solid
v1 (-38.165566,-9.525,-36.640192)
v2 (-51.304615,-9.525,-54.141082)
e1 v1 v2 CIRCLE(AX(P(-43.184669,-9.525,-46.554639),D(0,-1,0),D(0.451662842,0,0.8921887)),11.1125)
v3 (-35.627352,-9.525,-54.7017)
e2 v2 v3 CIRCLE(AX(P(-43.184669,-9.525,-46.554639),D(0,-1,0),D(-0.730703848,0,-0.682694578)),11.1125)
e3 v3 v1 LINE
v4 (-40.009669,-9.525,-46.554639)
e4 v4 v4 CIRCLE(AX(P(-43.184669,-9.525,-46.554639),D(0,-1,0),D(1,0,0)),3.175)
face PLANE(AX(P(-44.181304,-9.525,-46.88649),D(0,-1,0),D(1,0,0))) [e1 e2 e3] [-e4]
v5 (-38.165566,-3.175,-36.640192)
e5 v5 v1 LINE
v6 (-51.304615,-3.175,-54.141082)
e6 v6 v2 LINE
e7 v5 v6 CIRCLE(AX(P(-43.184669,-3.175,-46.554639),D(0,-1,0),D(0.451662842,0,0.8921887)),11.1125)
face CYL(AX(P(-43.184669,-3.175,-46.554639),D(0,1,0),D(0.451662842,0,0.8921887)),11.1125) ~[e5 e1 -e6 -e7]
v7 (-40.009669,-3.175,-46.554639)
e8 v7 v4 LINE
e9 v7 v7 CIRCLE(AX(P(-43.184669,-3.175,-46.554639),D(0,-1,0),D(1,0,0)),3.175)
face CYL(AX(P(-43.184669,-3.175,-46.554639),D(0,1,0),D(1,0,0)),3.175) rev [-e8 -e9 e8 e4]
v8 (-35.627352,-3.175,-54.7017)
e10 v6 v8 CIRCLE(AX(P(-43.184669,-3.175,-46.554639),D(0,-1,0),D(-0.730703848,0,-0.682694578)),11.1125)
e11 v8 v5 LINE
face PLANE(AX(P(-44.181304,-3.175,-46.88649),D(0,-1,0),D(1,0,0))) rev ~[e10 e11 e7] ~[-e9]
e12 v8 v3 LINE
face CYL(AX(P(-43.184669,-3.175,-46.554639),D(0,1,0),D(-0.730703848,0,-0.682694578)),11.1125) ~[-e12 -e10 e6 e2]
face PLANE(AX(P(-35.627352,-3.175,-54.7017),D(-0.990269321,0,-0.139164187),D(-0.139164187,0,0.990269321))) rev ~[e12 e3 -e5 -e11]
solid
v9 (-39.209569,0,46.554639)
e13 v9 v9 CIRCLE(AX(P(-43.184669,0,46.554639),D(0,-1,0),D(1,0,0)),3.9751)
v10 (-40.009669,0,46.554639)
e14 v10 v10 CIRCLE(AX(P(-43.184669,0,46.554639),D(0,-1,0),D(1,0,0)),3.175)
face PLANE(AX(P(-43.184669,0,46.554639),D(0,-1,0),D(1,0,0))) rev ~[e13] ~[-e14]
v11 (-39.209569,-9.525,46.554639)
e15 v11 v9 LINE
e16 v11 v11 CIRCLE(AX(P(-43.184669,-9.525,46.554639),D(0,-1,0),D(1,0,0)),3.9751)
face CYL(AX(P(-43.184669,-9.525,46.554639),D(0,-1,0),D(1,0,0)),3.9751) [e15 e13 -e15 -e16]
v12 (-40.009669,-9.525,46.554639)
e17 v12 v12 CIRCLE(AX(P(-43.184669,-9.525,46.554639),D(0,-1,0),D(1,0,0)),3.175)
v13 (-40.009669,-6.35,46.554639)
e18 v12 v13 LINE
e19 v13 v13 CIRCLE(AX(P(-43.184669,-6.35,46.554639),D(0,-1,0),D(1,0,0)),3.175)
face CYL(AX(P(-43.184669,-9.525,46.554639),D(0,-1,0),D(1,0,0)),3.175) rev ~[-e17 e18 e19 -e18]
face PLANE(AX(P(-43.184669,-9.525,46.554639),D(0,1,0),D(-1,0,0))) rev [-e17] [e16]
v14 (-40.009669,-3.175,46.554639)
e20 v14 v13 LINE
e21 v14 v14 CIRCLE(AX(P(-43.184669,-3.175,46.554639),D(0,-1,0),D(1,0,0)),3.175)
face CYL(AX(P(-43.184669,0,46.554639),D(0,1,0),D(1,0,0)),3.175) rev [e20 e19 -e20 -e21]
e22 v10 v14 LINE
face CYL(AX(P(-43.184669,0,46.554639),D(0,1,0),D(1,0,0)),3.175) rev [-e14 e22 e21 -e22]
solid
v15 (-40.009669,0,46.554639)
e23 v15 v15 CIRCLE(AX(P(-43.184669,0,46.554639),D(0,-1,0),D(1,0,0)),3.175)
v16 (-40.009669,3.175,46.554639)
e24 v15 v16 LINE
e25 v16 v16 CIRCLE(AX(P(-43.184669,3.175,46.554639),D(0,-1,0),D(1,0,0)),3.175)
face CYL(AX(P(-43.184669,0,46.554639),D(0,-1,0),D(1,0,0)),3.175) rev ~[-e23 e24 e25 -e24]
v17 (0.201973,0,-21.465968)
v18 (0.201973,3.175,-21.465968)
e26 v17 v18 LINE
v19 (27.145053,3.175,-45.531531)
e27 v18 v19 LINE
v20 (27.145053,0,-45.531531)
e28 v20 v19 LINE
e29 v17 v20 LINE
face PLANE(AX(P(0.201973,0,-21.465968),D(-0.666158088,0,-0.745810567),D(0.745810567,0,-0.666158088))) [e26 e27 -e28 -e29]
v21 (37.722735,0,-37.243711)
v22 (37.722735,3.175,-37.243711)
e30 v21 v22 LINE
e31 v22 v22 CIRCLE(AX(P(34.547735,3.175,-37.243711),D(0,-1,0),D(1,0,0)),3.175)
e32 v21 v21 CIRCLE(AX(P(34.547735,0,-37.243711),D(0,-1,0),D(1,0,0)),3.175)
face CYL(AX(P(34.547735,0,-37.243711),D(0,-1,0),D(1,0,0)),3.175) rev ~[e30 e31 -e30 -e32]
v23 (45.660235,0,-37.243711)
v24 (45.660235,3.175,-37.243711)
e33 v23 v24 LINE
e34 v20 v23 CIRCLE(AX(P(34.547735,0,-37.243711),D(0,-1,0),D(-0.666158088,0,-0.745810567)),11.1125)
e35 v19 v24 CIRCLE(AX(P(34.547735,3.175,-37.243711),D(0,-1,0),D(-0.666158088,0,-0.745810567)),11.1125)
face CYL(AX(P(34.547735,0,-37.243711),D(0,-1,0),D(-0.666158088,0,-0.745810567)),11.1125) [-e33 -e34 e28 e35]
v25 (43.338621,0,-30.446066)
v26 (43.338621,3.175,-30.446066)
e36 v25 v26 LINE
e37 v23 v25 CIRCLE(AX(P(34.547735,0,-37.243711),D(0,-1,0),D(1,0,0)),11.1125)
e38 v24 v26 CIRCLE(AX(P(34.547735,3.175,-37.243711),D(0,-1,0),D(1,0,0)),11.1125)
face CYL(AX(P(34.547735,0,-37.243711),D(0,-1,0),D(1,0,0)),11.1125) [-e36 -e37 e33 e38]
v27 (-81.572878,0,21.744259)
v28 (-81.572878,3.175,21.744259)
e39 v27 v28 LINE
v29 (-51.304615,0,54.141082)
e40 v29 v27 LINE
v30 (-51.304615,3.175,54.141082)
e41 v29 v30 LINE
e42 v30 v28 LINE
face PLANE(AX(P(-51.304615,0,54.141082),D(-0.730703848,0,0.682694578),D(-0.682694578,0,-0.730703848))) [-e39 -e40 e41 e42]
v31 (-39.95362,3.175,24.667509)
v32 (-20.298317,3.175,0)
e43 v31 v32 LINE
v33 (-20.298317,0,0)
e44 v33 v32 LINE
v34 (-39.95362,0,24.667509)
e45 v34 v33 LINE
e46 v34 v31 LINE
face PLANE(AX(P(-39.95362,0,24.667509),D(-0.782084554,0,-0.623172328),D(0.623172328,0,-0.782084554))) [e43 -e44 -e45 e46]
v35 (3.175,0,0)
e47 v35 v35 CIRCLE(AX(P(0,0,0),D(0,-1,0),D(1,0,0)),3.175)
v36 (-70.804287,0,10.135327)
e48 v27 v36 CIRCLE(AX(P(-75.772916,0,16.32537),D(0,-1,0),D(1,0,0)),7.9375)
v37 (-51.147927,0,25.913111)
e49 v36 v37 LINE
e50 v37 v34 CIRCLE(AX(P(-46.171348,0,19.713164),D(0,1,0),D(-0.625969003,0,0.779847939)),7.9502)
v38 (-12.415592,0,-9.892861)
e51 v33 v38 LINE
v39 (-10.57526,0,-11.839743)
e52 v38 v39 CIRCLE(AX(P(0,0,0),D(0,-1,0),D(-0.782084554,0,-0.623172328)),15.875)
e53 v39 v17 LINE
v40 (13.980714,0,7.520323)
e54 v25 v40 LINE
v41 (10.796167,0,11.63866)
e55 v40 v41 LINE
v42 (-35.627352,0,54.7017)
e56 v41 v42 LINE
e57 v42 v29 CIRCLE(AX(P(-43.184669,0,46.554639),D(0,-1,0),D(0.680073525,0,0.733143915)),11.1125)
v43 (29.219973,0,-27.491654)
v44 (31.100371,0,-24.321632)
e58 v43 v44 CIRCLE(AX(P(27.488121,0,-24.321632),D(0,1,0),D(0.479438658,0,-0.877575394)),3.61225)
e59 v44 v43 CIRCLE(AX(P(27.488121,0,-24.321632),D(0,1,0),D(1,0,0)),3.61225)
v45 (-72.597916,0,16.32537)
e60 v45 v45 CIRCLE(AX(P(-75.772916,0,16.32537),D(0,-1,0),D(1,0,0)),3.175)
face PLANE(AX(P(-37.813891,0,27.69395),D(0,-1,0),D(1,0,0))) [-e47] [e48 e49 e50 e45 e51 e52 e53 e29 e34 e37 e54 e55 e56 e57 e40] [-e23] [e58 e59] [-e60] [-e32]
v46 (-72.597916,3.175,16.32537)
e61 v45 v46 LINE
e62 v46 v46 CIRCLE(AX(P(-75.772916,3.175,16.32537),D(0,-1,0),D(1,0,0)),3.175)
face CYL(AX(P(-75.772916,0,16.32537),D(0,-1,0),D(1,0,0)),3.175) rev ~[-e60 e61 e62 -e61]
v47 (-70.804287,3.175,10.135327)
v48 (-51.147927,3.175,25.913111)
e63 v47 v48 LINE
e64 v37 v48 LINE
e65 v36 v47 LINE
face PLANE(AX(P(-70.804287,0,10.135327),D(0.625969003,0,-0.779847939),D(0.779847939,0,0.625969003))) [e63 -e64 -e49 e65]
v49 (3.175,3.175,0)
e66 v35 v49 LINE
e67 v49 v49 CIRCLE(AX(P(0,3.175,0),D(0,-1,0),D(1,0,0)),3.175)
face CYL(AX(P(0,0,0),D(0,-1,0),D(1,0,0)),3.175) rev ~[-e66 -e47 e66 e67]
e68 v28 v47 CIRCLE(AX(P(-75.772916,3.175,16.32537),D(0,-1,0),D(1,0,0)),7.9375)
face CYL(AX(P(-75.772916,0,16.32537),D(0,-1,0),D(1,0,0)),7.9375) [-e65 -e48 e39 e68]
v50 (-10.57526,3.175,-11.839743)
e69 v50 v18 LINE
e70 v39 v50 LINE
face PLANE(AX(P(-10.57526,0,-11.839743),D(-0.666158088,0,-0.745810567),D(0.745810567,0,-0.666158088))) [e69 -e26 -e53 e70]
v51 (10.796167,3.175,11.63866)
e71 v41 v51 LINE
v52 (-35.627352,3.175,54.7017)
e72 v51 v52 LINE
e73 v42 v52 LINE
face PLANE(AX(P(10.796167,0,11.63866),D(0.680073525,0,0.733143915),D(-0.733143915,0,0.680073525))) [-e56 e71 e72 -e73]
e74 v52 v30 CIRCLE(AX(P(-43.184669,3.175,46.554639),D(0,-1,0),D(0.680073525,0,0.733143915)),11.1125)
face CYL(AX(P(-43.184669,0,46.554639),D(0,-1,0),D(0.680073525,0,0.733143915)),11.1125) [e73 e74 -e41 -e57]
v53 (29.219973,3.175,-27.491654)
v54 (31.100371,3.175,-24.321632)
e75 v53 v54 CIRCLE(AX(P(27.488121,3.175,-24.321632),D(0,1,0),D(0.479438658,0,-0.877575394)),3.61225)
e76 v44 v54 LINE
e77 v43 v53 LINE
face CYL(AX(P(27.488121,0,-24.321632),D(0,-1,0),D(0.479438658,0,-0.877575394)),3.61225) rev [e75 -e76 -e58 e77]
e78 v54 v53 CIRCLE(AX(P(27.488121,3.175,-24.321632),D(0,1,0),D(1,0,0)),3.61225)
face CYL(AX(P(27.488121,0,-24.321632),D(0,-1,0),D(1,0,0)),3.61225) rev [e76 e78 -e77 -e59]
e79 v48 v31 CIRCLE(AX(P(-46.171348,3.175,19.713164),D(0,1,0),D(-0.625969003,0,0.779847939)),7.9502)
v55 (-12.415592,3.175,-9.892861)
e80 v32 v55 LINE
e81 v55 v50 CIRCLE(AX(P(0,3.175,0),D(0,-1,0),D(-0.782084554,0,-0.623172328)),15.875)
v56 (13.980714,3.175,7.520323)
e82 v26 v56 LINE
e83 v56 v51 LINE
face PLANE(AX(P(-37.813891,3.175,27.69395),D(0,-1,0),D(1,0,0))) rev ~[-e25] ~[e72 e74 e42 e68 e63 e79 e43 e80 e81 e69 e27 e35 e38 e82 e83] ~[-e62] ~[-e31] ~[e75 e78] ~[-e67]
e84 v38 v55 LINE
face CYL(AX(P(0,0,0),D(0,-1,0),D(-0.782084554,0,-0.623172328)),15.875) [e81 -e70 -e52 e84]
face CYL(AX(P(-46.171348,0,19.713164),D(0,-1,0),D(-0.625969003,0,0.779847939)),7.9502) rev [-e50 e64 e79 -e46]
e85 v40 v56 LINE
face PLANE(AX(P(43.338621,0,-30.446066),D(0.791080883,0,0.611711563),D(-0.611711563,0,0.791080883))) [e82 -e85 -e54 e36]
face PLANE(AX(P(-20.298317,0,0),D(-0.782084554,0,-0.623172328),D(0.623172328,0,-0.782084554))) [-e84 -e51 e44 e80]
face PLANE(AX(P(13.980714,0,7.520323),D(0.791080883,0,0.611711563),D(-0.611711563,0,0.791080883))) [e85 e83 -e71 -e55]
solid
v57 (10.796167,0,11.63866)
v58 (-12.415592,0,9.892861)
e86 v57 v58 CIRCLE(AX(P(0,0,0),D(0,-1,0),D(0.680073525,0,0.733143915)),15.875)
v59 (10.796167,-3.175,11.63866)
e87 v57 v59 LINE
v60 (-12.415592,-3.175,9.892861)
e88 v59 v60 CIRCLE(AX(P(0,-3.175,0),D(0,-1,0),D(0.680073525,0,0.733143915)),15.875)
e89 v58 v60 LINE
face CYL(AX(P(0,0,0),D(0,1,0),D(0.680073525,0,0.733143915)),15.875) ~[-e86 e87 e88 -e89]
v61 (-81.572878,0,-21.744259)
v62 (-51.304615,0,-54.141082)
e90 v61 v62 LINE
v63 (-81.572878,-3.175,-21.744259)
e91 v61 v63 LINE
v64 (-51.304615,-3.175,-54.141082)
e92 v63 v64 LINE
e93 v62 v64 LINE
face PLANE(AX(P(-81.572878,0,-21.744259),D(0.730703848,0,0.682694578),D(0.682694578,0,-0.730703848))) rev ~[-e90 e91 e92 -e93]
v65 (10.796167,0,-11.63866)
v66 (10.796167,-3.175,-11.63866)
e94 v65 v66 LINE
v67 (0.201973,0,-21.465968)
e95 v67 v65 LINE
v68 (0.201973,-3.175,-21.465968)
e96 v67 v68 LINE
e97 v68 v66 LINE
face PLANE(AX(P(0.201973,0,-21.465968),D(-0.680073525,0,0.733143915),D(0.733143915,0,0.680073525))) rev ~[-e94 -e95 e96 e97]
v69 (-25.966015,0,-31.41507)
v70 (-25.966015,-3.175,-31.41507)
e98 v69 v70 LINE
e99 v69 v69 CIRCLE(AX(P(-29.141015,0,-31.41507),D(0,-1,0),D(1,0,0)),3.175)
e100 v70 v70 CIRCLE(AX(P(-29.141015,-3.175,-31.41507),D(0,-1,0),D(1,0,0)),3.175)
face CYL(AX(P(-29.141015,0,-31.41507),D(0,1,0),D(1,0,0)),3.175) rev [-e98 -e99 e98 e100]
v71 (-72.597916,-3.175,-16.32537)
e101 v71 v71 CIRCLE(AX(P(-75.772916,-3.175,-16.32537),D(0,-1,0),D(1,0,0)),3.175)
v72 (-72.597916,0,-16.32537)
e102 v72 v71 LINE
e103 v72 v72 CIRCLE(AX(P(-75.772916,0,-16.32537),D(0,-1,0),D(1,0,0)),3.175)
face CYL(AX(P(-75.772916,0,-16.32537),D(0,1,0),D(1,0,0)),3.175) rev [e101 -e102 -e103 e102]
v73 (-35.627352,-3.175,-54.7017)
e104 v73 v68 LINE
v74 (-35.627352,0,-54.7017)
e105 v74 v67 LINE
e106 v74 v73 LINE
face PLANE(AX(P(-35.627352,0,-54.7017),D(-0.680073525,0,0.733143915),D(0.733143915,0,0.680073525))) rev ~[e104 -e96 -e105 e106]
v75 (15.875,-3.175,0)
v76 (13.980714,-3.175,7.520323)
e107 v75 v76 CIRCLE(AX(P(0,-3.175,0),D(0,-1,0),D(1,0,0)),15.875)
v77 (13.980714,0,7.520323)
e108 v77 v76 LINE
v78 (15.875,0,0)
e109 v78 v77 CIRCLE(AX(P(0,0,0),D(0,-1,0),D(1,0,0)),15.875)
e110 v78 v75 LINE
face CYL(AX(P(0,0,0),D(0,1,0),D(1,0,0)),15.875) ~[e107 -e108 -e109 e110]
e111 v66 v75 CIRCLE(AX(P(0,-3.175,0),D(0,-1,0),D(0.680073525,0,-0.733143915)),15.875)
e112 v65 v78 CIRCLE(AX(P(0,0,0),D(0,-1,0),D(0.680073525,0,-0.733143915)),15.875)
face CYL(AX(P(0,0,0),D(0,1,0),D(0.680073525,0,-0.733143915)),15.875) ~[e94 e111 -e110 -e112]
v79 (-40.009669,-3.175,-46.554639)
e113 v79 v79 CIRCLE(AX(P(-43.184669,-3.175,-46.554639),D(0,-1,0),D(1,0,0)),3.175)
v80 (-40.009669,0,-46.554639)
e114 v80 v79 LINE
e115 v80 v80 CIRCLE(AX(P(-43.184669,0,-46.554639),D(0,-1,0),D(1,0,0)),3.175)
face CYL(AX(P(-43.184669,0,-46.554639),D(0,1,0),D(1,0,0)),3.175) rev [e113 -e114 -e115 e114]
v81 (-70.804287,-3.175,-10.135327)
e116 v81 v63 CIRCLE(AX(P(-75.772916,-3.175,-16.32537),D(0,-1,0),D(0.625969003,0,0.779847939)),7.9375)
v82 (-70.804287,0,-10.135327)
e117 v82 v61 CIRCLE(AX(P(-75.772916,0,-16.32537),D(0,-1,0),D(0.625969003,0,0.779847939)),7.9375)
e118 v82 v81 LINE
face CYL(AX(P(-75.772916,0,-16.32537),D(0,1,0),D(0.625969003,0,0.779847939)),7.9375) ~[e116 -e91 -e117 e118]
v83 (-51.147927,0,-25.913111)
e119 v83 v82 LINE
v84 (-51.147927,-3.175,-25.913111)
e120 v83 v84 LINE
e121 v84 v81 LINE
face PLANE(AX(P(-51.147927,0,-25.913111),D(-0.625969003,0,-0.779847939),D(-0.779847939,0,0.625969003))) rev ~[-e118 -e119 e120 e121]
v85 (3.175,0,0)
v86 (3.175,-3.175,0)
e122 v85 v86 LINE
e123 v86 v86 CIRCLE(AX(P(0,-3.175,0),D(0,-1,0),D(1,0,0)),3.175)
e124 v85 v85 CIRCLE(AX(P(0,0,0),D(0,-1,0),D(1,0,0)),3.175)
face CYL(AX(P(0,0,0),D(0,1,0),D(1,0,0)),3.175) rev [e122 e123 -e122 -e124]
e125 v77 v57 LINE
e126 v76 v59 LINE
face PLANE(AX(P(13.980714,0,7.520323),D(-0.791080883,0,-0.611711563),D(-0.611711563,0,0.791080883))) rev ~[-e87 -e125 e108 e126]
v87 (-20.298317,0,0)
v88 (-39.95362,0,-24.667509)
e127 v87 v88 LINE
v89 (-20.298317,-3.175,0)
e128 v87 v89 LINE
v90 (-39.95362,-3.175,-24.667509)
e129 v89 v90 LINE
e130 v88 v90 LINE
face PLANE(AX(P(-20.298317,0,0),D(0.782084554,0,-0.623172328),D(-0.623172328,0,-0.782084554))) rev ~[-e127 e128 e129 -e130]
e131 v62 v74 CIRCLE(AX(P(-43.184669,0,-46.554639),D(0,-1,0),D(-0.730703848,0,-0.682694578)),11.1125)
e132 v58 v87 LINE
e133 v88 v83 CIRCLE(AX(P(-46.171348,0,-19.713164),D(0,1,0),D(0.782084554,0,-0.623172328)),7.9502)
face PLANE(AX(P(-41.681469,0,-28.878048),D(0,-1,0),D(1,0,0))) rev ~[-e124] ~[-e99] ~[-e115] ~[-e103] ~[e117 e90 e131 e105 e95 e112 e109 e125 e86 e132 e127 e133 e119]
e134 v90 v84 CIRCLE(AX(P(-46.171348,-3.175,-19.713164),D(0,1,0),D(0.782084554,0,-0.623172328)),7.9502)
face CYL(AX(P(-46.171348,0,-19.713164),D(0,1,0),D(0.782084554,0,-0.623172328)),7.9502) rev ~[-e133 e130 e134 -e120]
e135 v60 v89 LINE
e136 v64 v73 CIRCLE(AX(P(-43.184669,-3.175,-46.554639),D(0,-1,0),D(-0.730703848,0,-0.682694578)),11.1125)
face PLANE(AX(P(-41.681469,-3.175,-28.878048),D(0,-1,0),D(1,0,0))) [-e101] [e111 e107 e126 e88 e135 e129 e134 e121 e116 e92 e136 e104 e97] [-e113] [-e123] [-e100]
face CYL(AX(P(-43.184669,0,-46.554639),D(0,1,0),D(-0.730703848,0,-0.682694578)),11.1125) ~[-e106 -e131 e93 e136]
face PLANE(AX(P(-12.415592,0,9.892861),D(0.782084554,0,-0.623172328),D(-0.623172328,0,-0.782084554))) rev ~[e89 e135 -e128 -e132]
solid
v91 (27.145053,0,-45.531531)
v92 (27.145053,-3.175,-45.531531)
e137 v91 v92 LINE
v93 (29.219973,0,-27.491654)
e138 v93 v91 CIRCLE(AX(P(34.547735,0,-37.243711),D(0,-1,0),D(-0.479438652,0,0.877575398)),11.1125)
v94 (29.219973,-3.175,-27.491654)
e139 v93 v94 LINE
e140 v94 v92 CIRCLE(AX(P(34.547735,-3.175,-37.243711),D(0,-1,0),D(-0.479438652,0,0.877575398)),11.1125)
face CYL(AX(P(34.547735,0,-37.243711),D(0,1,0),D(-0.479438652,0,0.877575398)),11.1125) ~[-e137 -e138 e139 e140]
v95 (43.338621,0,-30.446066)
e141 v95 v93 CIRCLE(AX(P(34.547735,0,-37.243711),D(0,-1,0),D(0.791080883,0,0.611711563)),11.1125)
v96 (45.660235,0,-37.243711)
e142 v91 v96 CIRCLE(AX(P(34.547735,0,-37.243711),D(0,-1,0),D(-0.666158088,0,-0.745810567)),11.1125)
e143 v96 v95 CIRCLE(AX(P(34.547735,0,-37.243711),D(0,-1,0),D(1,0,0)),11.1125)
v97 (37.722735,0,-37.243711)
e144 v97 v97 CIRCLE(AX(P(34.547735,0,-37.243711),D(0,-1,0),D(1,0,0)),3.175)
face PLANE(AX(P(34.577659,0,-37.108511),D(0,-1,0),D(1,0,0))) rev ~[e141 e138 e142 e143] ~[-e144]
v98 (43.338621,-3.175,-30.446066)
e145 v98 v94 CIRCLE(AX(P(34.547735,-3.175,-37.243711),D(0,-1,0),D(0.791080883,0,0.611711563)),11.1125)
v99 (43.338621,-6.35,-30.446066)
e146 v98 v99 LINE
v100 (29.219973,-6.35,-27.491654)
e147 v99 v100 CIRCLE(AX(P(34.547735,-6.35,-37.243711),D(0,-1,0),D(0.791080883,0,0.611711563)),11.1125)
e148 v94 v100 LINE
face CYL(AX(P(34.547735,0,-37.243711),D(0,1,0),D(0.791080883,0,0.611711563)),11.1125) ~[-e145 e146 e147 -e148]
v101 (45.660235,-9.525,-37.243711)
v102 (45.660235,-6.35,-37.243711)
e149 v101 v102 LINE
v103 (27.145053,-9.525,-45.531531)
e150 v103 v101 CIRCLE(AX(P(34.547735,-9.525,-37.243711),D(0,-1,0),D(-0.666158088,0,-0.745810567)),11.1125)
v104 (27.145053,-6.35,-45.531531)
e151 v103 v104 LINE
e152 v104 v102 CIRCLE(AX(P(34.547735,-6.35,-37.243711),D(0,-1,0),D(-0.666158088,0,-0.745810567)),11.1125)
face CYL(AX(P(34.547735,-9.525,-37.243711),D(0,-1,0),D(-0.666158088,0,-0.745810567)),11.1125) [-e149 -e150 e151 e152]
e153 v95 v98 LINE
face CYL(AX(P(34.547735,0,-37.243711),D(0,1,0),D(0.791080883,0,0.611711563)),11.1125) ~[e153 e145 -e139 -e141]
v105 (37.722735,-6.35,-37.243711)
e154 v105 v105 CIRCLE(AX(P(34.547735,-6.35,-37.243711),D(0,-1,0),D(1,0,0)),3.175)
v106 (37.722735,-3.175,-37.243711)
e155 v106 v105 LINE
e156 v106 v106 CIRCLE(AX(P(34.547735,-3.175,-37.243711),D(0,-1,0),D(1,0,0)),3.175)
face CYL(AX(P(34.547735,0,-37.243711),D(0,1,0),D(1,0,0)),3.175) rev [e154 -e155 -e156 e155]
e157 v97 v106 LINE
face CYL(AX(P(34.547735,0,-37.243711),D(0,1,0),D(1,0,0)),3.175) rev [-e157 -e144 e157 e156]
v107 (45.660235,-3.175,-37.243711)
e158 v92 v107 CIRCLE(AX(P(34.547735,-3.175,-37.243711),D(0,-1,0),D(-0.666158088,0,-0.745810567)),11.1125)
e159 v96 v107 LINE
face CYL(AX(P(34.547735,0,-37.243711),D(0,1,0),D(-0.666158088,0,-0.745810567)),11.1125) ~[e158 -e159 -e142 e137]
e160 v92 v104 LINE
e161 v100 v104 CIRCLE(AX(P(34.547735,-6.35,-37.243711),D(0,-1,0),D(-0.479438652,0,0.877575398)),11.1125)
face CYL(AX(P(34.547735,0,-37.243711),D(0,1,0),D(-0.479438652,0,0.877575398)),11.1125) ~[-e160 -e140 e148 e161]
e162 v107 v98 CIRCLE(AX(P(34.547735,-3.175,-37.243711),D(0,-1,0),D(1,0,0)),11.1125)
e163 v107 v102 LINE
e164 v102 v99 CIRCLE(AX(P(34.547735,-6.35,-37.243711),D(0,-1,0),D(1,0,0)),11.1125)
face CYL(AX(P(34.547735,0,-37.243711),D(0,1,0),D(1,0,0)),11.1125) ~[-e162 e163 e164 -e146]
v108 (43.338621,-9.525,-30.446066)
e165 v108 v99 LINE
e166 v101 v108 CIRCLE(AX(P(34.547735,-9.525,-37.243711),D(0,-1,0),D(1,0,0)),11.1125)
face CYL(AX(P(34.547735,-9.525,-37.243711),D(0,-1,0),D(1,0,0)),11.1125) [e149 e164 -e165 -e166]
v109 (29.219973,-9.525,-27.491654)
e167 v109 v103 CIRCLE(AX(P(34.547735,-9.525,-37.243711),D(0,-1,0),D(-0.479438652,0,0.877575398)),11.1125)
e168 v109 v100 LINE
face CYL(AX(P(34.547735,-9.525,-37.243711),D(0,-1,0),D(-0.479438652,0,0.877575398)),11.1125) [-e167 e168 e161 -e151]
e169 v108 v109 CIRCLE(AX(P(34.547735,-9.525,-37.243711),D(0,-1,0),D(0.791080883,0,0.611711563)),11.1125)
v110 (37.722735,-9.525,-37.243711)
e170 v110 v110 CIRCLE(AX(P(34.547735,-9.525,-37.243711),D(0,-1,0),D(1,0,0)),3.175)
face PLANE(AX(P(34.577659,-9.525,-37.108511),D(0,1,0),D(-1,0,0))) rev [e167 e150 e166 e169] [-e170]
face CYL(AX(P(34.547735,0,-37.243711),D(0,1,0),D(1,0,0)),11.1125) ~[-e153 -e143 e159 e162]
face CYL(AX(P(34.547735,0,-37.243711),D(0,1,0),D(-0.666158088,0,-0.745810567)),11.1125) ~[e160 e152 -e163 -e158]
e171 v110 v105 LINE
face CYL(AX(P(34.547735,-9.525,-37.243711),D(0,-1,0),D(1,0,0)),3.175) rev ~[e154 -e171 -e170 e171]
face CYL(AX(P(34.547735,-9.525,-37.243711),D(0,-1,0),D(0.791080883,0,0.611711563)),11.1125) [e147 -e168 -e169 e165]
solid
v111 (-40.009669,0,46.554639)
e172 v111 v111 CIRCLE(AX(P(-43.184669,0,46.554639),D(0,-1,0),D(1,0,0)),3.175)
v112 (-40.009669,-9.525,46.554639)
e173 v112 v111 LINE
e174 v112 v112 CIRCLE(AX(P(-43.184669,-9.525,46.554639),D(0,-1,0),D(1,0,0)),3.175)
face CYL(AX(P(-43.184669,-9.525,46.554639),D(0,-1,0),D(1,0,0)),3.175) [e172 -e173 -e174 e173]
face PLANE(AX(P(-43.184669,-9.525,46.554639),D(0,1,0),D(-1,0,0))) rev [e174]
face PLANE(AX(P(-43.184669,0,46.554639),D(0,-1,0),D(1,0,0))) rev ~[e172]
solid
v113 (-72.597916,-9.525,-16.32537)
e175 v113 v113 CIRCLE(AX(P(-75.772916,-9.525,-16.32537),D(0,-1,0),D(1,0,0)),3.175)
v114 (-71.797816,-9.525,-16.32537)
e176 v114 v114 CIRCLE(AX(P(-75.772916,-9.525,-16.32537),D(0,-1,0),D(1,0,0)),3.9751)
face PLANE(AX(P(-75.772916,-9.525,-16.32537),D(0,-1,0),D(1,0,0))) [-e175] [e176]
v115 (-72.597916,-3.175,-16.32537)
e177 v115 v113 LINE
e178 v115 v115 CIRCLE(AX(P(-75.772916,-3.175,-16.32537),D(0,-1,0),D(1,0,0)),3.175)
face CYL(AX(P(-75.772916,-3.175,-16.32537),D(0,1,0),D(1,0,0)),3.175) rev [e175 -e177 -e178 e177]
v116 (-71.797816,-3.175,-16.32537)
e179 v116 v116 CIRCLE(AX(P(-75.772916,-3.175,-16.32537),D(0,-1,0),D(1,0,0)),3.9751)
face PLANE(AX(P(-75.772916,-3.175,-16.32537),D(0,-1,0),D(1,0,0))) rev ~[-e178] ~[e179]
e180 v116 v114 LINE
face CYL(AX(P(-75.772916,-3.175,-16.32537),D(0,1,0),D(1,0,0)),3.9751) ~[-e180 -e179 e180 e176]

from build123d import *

# Parameters (mm, degrees)
F0_R     = 3.175
F0_R_2   = 3.9751
F1_DEPTH = 3.175
F2_DEPTH = 3.175
F4_R     = 3.175
F6_DEPTH = 6.35
F4_R_2   = 3.9751
F3_R     = 3.9751
F3_R_2   = 3.175


# Not quite as in the source:
# - a pattern or mirror of a feature is missing from the dataset's text; its kind, count and spacing are read off the source's solid


with BuildPart() as f1:
    # F0 (on Front) → F1 (new body)
    with BuildSketch(Plane.XZ):
        with BuildLine():
            ThreePointArc((-12.4155922988, 9.8928607021), (-1.190625, 15.8302885984), (10.7961672163, 11.6386596495))
            Line((10.7961672163, 11.6386596495), (-35.6273518138, 54.7017003528))
            ThreePointArc((-35.6273518138, 54.7017003528), (-32.9996715166, 50.9991279116), (-32.0721688652, 46.5546385981))
            ThreePointArc((-32.0721688652, 46.5546385981), (-47.2623367435, 36.2173139479), (-51.3046153758, 54.141082094))
            Line((-51.3046153758, 54.141082094), (-81.5728776771, 21.7442586038))
            ThreePointArc((-81.5728776771, 21.7442586038), (-72.8602959708, 23.709173714), (-67.8354158839, 16.3253703924))
            ThreePointArc((-67.8354158839, 16.3253703924), (-68.6160171621, 12.8927756107), (-70.8042869228, 10.1353273799))
            Line((-70.8042869228, 10.1353273799), (-51.1479269508, 25.9131110286))
            ThreePointArc((-51.1479269508, 25.9131110286), (-45.2921470677, 27.6145996041), (-39.9536195601, 24.6675085869))
            Line((-39.9536195601, 24.6675085869), (-20.2983167404, 0))
            Line((-20.2983167404, 0), (-12.4155922988, 9.8928607021))
        make_face()
        with BuildLine():
            ThreePointArc((-67.8354158839, 16.3253703924), (-72.8602959708, 23.709173714), (-81.5728776771, 21.7442586038))
            ThreePointArc((-81.5728776771, 21.7442586038), (-81.5922457087, 10.9272867843), (-70.8042869228, 10.1353273799))
            ThreePointArc((-70.8042869228, 10.1353273799), (-68.6160171621, 12.8927756107), (-67.8354158839, 16.3253703924))
        make_face()
        with Locations((-75.7729158839, 16.3253703924)):
            Circle(F0_R, mode=Mode.SUBTRACT)
        with BuildLine():
            ThreePointArc((-32.0721688652, 46.5546385981), (-32.9996715166, 50.9991279116), (-35.6273518138, 54.7017003528))
            ThreePointArc((-35.6273518138, 54.7017003528), (-43.581797541, 57.6600402147), (-51.3046153758, 54.141082094))
            ThreePointArc((-51.3046153758, 54.141082094), (-47.2623367435, 36.2173139479), (-32.0721688652, 46.5546385981))
        make_face()
        with Locations((-43.1846688652, 46.5546385981)):
            Circle(F0_R, mode=Mode.SUBTRACT)
        with BuildLine():
            Line((43.3386214046, -30.4460661325), (13.9807141591, 7.5203229054))
            ThreePointArc((13.9807141591, 7.5203229054), (15.3941460022, 3.8776144551), (15.875, 0))
            ThreePointArc((15.875, 0), (14.5499962124, -6.3492704479), (10.7961672163, -11.6386596495))
            Line((10.7961672163, -11.6386596495), (0.2019726407, -21.4659679139))
            Line((0.2019726407, -21.4659679139), (27.1450533438, -45.5315308079))
            ThreePointArc((27.1450533438, -45.5315308079), (23.5080187906, -35.9739391549), (29.2199730699, -27.4916542706))
            ThreePointArc((29.2199730699, -27.4916542706), (36.8237941478, -26.366799027), (43.3386214046, -30.4460661325))
        make_face()
        with BuildLine():
            ThreePointArc((31.1003708361, -24.3216324516), (30.5949064185, -26.1645197306), (29.2199730699, -27.4916542706))
            ThreePointArc((29.2199730699, -27.4916542706), (24.3813350251, -22.4787451727), (31.1003708361, -24.3216324516))
        make_face(mode=Mode.SUBTRACT)
        with BuildLine():
            Line((13.9807141591, 7.5203229054), (10.7961672163, 11.6386596495))
            ThreePointArc((10.7961672163, 11.6386596495), (-1.190625, 15.8302885984), (-12.4155922988, 9.8928607021))
            ThreePointArc((-12.4155922988, 9.8928607021), (-15.875, 0), (-12.4155922988, -9.8928607021))
            ThreePointArc((-12.4155922988, -9.8928607021), (-11.5365681923, -10.9051923112), (-10.5752596405, -11.8397427563))
            ThreePointArc((-10.5752596405, -11.8397427563), (0.1493607821, -15.87429735), (10.7961672163, -11.6386596495))
            ThreePointArc((10.7961672163, -11.6386596495), (14.5499962124, -6.3492704479), (15.875, 0))
            ThreePointArc((15.875, 0), (15.3941460022, 3.8776144551), (13.9807141591, 7.5203229054))
        make_face()
        Circle(F0_R_2, mode=Mode.SUBTRACT)
        with BuildLine():
            ThreePointArc((45.6602350922, -37.2437108785), (45.0638270563, -33.6521282118), (43.3386214046, -30.4460661325))
            ThreePointArc((43.3386214046, -30.4460661325), (36.8237941478, -26.366799027), (29.2199730699, -27.4916542706))
            ThreePointArc((29.2199730699, -27.4916542706), (23.5080187906, -35.9739391549), (27.1450533438, -45.5315308079))
            ThreePointArc((27.1450533438, -45.5315308079), (39.0878537757, -47.3864412106), (45.6602350922, -37.2437108785))
        make_face()
        with Locations((34.5477350922, -37.2437108785)):
            Circle(F0_R, mode=Mode.SUBTRACT)
        with BuildLine():
            ThreePointArc((-12.4155922988, -9.8928607021), (-15.875, 0), (-12.4155922988, 9.8928607021))
            Line((-12.4155922988, 9.8928607021), (-20.2983167404, 0))
            Line((-20.2983167404, 0), (-12.4155922988, -9.8928607021))
        make_face()
        with BuildLine():
            ThreePointArc((10.7961672163, -11.6386596495), (0.1493607821, -15.87429735), (-10.5752596405, -11.8397427563))
            Line((-10.5752596405, -11.8397427563), (0.2019726407, -21.4659679139))
            Line((0.2019726407, -21.4659679139), (10.7961672163, -11.6386596495))
        make_face()
        Circle(F0_R_2)
        Circle(F0_R, mode=Mode.SUBTRACT)
    extrude(amount=-F1_DEPTH)


with BuildPart() as f2:
    # F0 (on Front) → F2 (new body)
    with BuildSketch(Plane.XZ):
        with BuildLine():
            ThreePointArc((-10.5752596405, -11.8397427563), (-11.5365681923, -10.9051923112), (-12.4155922988, -9.8928607021))
            Line((-12.4155922988, -9.8928607021), (-20.2983167404, 0))
            Line((-20.2983167404, 0), (-39.9536195601, -24.6675085869))
            ThreePointArc((-39.9536195601, -24.6675085869), (-45.2921470677, -27.6145996041), (-51.1479269508, -25.9131110286))
            Line((-51.1479269508, -25.9131110286), (-70.8042869228, -10.1353273799))
            ThreePointArc((-70.8042869228, -10.1353273799), (-68.6160171621, -12.8927756107), (-67.8354158839, -16.3253703924))
            ThreePointArc((-67.8354158839, -16.3253703924), (-72.8602959708, -23.709173714), (-81.5728776771, -21.7442586038))
            Line((-81.5728776771, -21.7442586038), (-51.3046153758, -54.141082094))
            ThreePointArc((-51.3046153758, -54.141082094), (-47.2623367435, -36.2173139479), (-32.0721688652, -46.5546385981))
            ThreePointArc((-32.0721688652, -46.5546385981), (-32.9996715166, -50.9991279116), (-35.6273518138, -54.7017003528))
            Line((-35.6273518138, -54.7017003528), (0.2019726407, -21.4659679139))
            Line((0.2019726407, -21.4659679139), (-10.5752596405, -11.8397427563))
        make_face()
        with Locations((-29.1410145503, -31.415070126)):
            Circle(F0_R, mode=Mode.SUBTRACT)
        with BuildLine():
            ThreePointArc((-67.8354158839, -16.3253703924), (-68.6160171621, -12.8927756107), (-70.8042869228, -10.1353273799))
            ThreePointArc((-70.8042869228, -10.1353273799), (-81.5922457087, -10.9272867843), (-81.5728776771, -21.7442586038))
            ThreePointArc((-81.5728776771, -21.7442586038), (-72.8602959708, -23.709173714), (-67.8354158839, -16.3253703924))
        make_face()
        with Locations((-75.7729158839, -16.3253703924)):
            Circle(F0_R, mode=Mode.SUBTRACT)
        with BuildLine():
            ThreePointArc((-51.3046153758, -54.141082094), (-43.581797541, -57.6600402147), (-35.6273518138, -54.7017003528))
            ThreePointArc((-35.6273518138, -54.7017003528), (-32.9996715166, -50.9991279116), (-32.0721688652, -46.5546385981))
            ThreePointArc((-32.0721688652, -46.5546385981), (-47.2623367435, -36.2173139479), (-51.3046153758, -54.141082094))
        make_face()
        with Locations((-43.1846688652, -46.5546385981)):
            Circle(F0_R, mode=Mode.SUBTRACT)
        with BuildLine():
            ThreePointArc((-12.4155922988, -9.8928607021), (-15.875, 0), (-12.4155922988, 9.8928607021))
            Line((-12.4155922988, 9.8928607021), (-20.2983167404, 0))
            Line((-20.2983167404, 0), (-12.4155922988, -9.8928607021))
        make_face()
        with BuildLine():
            Line((13.9807141591, 7.5203229054), (10.7961672163, 11.6386596495))
            ThreePointArc((10.7961672163, 11.6386596495), (-1.190625, 15.8302885984), (-12.4155922988, 9.8928607021))
            ThreePointArc((-12.4155922988, 9.8928607021), (-15.875, 0), (-12.4155922988, -9.8928607021))
            ThreePointArc((-12.4155922988, -9.8928607021), (-11.5365681923, -10.9051923112), (-10.5752596405, -11.8397427563))
            ThreePointArc((-10.5752596405, -11.8397427563), (0.1493607821, -15.87429735), (10.7961672163, -11.6386596495))
            ThreePointArc((10.7961672163, -11.6386596495), (14.5499962124, -6.3492704479), (15.875, 0))
            ThreePointArc((15.875, 0), (15.3941460022, 3.8776144551), (13.9807141591, 7.5203229054))
        make_face()
        Circle(F0_R_2, mode=Mode.SUBTRACT)
        with BuildLine():
            ThreePointArc((10.7961672163, -11.6386596495), (0.1493607821, -15.87429735), (-10.5752596405, -11.8397427563))
            Line((-10.5752596405, -11.8397427563), (0.2019726407, -21.4659679139))
            Line((0.2019726407, -21.4659679139), (10.7961672163, -11.6386596495))
        make_face()
        Circle(F0_R_2)
        Circle(F0_R, mode=Mode.SUBTRACT)
    extrude(amount=F2_DEPTH)


with BuildPart() as f6:
    # F4 (on face) → F6 (new body, through all)
    with BuildSketch(Plane.XZ.offset(3.175)):
        with BuildLine():
            Line((-35.6273518138, -54.7017003528), (-38.1655655345, -36.6401916642))
            ThreePointArc((-38.1655655345, -36.6401916642), (-52.0714060936, -39.882790452), (-51.3046153758, -54.141082094))
            ThreePointArc((-51.3046153758, -54.141082094), (-43.581797541, -57.6600402147), (-35.6273518138, -54.7017003528))
        make_face()
        with Locations((-43.1846688652, -46.5546385981)):
            Circle(F4_R, mode=Mode.SUBTRACT)
    extrude(amount=F6_DEPTH)


with BuildPart() as f6b:
    # F4 (on face) → F6, piece 2 (new body, through all)
    with BuildSketch(Plane.XZ.offset(3.175)):
        with Locations((-75.7729158839, -16.3253703924)):
            Circle(F4_R_2)
        with Locations((-75.7729158839, -16.3253703924)):
            Circle(F4_R, mode=Mode.SUBTRACT)
    extrude(amount=F6_DEPTH)


with BuildPart() as f6c:
    # F0 (on Front) → F6, piece 3 (new body, through all)
    with BuildSketch(Plane.XZ):
        with BuildLine():
            ThreePointArc((45.6602350922, -37.2437108785), (45.0638270563, -33.6521282118), (43.3386214046, -30.4460661325))
            ThreePointArc((43.3386214046, -30.4460661325), (36.8237941478, -26.366799027), (29.2199730699, -27.4916542706))
            ThreePointArc((29.2199730699, -27.4916542706), (23.5080187906, -35.9739391549), (27.1450533438, -45.5315308079))
            ThreePointArc((27.1450533438, -45.5315308079), (39.0878537757, -47.3864412106), (45.6602350922, -37.2437108785))
        make_face()
        with Locations((34.5477350922, -37.2437108785)):
            Circle(F0_R, mode=Mode.SUBTRACT)
    extrude(amount=F6_DEPTH)

    # F6_3_copies: F6c across plane


with BuildPart() as f6d:
    # F0 (on Front) → F6, piece 4 (new body, through all)
    with BuildSketch(Plane.XZ):
        with Locations((-43.1846688652, 46.5546385981)):
            Circle(F0_R)
    extrude(amount=F6_DEPTH)

    # F6_4_copies: F6d across plane


with BuildPart() as f6e:
    # F3 (on face) → F6, piece 5 (new body, through all)
    with BuildSketch(Plane.XZ):
        with Locations((-43.1846688652, 46.5546385981)):
            Circle(F3_R)
        with Locations((-43.1846688652, 46.5546385981)):
            Circle(F3_R_2, mode=Mode.SUBTRACT)
    extrude(amount=F6_DEPTH)

    # F6_5_copies: F6e across plane


with BuildPart() as f6c_1:
    add(f6c.part)
    add(f6c.part.mirror(Plane(origin=(0, -4.7625, 0), x_dir=(0, 0, -1), z_dir=(0, -1, 0))))


with BuildPart() as f6d_1:
    add(f6d.part)
    add(f6d.part.mirror(Plane(origin=(0, -4.7625, 0), x_dir=(0, 0, -1), z_dir=(0, -1, 0))))


with BuildPart() as f6e_1:
    add(f6e.part)
    add(f6e.part.mirror(Plane(origin=(0, -4.7625, 0), x_dir=(0, 0, -1), z_dir=(0, -1, 0))))


solid = Compound([f1.part, f2.part, f6.part, f6b.part, f6c_1.part, f6d_1.part, f6e_1.part])
